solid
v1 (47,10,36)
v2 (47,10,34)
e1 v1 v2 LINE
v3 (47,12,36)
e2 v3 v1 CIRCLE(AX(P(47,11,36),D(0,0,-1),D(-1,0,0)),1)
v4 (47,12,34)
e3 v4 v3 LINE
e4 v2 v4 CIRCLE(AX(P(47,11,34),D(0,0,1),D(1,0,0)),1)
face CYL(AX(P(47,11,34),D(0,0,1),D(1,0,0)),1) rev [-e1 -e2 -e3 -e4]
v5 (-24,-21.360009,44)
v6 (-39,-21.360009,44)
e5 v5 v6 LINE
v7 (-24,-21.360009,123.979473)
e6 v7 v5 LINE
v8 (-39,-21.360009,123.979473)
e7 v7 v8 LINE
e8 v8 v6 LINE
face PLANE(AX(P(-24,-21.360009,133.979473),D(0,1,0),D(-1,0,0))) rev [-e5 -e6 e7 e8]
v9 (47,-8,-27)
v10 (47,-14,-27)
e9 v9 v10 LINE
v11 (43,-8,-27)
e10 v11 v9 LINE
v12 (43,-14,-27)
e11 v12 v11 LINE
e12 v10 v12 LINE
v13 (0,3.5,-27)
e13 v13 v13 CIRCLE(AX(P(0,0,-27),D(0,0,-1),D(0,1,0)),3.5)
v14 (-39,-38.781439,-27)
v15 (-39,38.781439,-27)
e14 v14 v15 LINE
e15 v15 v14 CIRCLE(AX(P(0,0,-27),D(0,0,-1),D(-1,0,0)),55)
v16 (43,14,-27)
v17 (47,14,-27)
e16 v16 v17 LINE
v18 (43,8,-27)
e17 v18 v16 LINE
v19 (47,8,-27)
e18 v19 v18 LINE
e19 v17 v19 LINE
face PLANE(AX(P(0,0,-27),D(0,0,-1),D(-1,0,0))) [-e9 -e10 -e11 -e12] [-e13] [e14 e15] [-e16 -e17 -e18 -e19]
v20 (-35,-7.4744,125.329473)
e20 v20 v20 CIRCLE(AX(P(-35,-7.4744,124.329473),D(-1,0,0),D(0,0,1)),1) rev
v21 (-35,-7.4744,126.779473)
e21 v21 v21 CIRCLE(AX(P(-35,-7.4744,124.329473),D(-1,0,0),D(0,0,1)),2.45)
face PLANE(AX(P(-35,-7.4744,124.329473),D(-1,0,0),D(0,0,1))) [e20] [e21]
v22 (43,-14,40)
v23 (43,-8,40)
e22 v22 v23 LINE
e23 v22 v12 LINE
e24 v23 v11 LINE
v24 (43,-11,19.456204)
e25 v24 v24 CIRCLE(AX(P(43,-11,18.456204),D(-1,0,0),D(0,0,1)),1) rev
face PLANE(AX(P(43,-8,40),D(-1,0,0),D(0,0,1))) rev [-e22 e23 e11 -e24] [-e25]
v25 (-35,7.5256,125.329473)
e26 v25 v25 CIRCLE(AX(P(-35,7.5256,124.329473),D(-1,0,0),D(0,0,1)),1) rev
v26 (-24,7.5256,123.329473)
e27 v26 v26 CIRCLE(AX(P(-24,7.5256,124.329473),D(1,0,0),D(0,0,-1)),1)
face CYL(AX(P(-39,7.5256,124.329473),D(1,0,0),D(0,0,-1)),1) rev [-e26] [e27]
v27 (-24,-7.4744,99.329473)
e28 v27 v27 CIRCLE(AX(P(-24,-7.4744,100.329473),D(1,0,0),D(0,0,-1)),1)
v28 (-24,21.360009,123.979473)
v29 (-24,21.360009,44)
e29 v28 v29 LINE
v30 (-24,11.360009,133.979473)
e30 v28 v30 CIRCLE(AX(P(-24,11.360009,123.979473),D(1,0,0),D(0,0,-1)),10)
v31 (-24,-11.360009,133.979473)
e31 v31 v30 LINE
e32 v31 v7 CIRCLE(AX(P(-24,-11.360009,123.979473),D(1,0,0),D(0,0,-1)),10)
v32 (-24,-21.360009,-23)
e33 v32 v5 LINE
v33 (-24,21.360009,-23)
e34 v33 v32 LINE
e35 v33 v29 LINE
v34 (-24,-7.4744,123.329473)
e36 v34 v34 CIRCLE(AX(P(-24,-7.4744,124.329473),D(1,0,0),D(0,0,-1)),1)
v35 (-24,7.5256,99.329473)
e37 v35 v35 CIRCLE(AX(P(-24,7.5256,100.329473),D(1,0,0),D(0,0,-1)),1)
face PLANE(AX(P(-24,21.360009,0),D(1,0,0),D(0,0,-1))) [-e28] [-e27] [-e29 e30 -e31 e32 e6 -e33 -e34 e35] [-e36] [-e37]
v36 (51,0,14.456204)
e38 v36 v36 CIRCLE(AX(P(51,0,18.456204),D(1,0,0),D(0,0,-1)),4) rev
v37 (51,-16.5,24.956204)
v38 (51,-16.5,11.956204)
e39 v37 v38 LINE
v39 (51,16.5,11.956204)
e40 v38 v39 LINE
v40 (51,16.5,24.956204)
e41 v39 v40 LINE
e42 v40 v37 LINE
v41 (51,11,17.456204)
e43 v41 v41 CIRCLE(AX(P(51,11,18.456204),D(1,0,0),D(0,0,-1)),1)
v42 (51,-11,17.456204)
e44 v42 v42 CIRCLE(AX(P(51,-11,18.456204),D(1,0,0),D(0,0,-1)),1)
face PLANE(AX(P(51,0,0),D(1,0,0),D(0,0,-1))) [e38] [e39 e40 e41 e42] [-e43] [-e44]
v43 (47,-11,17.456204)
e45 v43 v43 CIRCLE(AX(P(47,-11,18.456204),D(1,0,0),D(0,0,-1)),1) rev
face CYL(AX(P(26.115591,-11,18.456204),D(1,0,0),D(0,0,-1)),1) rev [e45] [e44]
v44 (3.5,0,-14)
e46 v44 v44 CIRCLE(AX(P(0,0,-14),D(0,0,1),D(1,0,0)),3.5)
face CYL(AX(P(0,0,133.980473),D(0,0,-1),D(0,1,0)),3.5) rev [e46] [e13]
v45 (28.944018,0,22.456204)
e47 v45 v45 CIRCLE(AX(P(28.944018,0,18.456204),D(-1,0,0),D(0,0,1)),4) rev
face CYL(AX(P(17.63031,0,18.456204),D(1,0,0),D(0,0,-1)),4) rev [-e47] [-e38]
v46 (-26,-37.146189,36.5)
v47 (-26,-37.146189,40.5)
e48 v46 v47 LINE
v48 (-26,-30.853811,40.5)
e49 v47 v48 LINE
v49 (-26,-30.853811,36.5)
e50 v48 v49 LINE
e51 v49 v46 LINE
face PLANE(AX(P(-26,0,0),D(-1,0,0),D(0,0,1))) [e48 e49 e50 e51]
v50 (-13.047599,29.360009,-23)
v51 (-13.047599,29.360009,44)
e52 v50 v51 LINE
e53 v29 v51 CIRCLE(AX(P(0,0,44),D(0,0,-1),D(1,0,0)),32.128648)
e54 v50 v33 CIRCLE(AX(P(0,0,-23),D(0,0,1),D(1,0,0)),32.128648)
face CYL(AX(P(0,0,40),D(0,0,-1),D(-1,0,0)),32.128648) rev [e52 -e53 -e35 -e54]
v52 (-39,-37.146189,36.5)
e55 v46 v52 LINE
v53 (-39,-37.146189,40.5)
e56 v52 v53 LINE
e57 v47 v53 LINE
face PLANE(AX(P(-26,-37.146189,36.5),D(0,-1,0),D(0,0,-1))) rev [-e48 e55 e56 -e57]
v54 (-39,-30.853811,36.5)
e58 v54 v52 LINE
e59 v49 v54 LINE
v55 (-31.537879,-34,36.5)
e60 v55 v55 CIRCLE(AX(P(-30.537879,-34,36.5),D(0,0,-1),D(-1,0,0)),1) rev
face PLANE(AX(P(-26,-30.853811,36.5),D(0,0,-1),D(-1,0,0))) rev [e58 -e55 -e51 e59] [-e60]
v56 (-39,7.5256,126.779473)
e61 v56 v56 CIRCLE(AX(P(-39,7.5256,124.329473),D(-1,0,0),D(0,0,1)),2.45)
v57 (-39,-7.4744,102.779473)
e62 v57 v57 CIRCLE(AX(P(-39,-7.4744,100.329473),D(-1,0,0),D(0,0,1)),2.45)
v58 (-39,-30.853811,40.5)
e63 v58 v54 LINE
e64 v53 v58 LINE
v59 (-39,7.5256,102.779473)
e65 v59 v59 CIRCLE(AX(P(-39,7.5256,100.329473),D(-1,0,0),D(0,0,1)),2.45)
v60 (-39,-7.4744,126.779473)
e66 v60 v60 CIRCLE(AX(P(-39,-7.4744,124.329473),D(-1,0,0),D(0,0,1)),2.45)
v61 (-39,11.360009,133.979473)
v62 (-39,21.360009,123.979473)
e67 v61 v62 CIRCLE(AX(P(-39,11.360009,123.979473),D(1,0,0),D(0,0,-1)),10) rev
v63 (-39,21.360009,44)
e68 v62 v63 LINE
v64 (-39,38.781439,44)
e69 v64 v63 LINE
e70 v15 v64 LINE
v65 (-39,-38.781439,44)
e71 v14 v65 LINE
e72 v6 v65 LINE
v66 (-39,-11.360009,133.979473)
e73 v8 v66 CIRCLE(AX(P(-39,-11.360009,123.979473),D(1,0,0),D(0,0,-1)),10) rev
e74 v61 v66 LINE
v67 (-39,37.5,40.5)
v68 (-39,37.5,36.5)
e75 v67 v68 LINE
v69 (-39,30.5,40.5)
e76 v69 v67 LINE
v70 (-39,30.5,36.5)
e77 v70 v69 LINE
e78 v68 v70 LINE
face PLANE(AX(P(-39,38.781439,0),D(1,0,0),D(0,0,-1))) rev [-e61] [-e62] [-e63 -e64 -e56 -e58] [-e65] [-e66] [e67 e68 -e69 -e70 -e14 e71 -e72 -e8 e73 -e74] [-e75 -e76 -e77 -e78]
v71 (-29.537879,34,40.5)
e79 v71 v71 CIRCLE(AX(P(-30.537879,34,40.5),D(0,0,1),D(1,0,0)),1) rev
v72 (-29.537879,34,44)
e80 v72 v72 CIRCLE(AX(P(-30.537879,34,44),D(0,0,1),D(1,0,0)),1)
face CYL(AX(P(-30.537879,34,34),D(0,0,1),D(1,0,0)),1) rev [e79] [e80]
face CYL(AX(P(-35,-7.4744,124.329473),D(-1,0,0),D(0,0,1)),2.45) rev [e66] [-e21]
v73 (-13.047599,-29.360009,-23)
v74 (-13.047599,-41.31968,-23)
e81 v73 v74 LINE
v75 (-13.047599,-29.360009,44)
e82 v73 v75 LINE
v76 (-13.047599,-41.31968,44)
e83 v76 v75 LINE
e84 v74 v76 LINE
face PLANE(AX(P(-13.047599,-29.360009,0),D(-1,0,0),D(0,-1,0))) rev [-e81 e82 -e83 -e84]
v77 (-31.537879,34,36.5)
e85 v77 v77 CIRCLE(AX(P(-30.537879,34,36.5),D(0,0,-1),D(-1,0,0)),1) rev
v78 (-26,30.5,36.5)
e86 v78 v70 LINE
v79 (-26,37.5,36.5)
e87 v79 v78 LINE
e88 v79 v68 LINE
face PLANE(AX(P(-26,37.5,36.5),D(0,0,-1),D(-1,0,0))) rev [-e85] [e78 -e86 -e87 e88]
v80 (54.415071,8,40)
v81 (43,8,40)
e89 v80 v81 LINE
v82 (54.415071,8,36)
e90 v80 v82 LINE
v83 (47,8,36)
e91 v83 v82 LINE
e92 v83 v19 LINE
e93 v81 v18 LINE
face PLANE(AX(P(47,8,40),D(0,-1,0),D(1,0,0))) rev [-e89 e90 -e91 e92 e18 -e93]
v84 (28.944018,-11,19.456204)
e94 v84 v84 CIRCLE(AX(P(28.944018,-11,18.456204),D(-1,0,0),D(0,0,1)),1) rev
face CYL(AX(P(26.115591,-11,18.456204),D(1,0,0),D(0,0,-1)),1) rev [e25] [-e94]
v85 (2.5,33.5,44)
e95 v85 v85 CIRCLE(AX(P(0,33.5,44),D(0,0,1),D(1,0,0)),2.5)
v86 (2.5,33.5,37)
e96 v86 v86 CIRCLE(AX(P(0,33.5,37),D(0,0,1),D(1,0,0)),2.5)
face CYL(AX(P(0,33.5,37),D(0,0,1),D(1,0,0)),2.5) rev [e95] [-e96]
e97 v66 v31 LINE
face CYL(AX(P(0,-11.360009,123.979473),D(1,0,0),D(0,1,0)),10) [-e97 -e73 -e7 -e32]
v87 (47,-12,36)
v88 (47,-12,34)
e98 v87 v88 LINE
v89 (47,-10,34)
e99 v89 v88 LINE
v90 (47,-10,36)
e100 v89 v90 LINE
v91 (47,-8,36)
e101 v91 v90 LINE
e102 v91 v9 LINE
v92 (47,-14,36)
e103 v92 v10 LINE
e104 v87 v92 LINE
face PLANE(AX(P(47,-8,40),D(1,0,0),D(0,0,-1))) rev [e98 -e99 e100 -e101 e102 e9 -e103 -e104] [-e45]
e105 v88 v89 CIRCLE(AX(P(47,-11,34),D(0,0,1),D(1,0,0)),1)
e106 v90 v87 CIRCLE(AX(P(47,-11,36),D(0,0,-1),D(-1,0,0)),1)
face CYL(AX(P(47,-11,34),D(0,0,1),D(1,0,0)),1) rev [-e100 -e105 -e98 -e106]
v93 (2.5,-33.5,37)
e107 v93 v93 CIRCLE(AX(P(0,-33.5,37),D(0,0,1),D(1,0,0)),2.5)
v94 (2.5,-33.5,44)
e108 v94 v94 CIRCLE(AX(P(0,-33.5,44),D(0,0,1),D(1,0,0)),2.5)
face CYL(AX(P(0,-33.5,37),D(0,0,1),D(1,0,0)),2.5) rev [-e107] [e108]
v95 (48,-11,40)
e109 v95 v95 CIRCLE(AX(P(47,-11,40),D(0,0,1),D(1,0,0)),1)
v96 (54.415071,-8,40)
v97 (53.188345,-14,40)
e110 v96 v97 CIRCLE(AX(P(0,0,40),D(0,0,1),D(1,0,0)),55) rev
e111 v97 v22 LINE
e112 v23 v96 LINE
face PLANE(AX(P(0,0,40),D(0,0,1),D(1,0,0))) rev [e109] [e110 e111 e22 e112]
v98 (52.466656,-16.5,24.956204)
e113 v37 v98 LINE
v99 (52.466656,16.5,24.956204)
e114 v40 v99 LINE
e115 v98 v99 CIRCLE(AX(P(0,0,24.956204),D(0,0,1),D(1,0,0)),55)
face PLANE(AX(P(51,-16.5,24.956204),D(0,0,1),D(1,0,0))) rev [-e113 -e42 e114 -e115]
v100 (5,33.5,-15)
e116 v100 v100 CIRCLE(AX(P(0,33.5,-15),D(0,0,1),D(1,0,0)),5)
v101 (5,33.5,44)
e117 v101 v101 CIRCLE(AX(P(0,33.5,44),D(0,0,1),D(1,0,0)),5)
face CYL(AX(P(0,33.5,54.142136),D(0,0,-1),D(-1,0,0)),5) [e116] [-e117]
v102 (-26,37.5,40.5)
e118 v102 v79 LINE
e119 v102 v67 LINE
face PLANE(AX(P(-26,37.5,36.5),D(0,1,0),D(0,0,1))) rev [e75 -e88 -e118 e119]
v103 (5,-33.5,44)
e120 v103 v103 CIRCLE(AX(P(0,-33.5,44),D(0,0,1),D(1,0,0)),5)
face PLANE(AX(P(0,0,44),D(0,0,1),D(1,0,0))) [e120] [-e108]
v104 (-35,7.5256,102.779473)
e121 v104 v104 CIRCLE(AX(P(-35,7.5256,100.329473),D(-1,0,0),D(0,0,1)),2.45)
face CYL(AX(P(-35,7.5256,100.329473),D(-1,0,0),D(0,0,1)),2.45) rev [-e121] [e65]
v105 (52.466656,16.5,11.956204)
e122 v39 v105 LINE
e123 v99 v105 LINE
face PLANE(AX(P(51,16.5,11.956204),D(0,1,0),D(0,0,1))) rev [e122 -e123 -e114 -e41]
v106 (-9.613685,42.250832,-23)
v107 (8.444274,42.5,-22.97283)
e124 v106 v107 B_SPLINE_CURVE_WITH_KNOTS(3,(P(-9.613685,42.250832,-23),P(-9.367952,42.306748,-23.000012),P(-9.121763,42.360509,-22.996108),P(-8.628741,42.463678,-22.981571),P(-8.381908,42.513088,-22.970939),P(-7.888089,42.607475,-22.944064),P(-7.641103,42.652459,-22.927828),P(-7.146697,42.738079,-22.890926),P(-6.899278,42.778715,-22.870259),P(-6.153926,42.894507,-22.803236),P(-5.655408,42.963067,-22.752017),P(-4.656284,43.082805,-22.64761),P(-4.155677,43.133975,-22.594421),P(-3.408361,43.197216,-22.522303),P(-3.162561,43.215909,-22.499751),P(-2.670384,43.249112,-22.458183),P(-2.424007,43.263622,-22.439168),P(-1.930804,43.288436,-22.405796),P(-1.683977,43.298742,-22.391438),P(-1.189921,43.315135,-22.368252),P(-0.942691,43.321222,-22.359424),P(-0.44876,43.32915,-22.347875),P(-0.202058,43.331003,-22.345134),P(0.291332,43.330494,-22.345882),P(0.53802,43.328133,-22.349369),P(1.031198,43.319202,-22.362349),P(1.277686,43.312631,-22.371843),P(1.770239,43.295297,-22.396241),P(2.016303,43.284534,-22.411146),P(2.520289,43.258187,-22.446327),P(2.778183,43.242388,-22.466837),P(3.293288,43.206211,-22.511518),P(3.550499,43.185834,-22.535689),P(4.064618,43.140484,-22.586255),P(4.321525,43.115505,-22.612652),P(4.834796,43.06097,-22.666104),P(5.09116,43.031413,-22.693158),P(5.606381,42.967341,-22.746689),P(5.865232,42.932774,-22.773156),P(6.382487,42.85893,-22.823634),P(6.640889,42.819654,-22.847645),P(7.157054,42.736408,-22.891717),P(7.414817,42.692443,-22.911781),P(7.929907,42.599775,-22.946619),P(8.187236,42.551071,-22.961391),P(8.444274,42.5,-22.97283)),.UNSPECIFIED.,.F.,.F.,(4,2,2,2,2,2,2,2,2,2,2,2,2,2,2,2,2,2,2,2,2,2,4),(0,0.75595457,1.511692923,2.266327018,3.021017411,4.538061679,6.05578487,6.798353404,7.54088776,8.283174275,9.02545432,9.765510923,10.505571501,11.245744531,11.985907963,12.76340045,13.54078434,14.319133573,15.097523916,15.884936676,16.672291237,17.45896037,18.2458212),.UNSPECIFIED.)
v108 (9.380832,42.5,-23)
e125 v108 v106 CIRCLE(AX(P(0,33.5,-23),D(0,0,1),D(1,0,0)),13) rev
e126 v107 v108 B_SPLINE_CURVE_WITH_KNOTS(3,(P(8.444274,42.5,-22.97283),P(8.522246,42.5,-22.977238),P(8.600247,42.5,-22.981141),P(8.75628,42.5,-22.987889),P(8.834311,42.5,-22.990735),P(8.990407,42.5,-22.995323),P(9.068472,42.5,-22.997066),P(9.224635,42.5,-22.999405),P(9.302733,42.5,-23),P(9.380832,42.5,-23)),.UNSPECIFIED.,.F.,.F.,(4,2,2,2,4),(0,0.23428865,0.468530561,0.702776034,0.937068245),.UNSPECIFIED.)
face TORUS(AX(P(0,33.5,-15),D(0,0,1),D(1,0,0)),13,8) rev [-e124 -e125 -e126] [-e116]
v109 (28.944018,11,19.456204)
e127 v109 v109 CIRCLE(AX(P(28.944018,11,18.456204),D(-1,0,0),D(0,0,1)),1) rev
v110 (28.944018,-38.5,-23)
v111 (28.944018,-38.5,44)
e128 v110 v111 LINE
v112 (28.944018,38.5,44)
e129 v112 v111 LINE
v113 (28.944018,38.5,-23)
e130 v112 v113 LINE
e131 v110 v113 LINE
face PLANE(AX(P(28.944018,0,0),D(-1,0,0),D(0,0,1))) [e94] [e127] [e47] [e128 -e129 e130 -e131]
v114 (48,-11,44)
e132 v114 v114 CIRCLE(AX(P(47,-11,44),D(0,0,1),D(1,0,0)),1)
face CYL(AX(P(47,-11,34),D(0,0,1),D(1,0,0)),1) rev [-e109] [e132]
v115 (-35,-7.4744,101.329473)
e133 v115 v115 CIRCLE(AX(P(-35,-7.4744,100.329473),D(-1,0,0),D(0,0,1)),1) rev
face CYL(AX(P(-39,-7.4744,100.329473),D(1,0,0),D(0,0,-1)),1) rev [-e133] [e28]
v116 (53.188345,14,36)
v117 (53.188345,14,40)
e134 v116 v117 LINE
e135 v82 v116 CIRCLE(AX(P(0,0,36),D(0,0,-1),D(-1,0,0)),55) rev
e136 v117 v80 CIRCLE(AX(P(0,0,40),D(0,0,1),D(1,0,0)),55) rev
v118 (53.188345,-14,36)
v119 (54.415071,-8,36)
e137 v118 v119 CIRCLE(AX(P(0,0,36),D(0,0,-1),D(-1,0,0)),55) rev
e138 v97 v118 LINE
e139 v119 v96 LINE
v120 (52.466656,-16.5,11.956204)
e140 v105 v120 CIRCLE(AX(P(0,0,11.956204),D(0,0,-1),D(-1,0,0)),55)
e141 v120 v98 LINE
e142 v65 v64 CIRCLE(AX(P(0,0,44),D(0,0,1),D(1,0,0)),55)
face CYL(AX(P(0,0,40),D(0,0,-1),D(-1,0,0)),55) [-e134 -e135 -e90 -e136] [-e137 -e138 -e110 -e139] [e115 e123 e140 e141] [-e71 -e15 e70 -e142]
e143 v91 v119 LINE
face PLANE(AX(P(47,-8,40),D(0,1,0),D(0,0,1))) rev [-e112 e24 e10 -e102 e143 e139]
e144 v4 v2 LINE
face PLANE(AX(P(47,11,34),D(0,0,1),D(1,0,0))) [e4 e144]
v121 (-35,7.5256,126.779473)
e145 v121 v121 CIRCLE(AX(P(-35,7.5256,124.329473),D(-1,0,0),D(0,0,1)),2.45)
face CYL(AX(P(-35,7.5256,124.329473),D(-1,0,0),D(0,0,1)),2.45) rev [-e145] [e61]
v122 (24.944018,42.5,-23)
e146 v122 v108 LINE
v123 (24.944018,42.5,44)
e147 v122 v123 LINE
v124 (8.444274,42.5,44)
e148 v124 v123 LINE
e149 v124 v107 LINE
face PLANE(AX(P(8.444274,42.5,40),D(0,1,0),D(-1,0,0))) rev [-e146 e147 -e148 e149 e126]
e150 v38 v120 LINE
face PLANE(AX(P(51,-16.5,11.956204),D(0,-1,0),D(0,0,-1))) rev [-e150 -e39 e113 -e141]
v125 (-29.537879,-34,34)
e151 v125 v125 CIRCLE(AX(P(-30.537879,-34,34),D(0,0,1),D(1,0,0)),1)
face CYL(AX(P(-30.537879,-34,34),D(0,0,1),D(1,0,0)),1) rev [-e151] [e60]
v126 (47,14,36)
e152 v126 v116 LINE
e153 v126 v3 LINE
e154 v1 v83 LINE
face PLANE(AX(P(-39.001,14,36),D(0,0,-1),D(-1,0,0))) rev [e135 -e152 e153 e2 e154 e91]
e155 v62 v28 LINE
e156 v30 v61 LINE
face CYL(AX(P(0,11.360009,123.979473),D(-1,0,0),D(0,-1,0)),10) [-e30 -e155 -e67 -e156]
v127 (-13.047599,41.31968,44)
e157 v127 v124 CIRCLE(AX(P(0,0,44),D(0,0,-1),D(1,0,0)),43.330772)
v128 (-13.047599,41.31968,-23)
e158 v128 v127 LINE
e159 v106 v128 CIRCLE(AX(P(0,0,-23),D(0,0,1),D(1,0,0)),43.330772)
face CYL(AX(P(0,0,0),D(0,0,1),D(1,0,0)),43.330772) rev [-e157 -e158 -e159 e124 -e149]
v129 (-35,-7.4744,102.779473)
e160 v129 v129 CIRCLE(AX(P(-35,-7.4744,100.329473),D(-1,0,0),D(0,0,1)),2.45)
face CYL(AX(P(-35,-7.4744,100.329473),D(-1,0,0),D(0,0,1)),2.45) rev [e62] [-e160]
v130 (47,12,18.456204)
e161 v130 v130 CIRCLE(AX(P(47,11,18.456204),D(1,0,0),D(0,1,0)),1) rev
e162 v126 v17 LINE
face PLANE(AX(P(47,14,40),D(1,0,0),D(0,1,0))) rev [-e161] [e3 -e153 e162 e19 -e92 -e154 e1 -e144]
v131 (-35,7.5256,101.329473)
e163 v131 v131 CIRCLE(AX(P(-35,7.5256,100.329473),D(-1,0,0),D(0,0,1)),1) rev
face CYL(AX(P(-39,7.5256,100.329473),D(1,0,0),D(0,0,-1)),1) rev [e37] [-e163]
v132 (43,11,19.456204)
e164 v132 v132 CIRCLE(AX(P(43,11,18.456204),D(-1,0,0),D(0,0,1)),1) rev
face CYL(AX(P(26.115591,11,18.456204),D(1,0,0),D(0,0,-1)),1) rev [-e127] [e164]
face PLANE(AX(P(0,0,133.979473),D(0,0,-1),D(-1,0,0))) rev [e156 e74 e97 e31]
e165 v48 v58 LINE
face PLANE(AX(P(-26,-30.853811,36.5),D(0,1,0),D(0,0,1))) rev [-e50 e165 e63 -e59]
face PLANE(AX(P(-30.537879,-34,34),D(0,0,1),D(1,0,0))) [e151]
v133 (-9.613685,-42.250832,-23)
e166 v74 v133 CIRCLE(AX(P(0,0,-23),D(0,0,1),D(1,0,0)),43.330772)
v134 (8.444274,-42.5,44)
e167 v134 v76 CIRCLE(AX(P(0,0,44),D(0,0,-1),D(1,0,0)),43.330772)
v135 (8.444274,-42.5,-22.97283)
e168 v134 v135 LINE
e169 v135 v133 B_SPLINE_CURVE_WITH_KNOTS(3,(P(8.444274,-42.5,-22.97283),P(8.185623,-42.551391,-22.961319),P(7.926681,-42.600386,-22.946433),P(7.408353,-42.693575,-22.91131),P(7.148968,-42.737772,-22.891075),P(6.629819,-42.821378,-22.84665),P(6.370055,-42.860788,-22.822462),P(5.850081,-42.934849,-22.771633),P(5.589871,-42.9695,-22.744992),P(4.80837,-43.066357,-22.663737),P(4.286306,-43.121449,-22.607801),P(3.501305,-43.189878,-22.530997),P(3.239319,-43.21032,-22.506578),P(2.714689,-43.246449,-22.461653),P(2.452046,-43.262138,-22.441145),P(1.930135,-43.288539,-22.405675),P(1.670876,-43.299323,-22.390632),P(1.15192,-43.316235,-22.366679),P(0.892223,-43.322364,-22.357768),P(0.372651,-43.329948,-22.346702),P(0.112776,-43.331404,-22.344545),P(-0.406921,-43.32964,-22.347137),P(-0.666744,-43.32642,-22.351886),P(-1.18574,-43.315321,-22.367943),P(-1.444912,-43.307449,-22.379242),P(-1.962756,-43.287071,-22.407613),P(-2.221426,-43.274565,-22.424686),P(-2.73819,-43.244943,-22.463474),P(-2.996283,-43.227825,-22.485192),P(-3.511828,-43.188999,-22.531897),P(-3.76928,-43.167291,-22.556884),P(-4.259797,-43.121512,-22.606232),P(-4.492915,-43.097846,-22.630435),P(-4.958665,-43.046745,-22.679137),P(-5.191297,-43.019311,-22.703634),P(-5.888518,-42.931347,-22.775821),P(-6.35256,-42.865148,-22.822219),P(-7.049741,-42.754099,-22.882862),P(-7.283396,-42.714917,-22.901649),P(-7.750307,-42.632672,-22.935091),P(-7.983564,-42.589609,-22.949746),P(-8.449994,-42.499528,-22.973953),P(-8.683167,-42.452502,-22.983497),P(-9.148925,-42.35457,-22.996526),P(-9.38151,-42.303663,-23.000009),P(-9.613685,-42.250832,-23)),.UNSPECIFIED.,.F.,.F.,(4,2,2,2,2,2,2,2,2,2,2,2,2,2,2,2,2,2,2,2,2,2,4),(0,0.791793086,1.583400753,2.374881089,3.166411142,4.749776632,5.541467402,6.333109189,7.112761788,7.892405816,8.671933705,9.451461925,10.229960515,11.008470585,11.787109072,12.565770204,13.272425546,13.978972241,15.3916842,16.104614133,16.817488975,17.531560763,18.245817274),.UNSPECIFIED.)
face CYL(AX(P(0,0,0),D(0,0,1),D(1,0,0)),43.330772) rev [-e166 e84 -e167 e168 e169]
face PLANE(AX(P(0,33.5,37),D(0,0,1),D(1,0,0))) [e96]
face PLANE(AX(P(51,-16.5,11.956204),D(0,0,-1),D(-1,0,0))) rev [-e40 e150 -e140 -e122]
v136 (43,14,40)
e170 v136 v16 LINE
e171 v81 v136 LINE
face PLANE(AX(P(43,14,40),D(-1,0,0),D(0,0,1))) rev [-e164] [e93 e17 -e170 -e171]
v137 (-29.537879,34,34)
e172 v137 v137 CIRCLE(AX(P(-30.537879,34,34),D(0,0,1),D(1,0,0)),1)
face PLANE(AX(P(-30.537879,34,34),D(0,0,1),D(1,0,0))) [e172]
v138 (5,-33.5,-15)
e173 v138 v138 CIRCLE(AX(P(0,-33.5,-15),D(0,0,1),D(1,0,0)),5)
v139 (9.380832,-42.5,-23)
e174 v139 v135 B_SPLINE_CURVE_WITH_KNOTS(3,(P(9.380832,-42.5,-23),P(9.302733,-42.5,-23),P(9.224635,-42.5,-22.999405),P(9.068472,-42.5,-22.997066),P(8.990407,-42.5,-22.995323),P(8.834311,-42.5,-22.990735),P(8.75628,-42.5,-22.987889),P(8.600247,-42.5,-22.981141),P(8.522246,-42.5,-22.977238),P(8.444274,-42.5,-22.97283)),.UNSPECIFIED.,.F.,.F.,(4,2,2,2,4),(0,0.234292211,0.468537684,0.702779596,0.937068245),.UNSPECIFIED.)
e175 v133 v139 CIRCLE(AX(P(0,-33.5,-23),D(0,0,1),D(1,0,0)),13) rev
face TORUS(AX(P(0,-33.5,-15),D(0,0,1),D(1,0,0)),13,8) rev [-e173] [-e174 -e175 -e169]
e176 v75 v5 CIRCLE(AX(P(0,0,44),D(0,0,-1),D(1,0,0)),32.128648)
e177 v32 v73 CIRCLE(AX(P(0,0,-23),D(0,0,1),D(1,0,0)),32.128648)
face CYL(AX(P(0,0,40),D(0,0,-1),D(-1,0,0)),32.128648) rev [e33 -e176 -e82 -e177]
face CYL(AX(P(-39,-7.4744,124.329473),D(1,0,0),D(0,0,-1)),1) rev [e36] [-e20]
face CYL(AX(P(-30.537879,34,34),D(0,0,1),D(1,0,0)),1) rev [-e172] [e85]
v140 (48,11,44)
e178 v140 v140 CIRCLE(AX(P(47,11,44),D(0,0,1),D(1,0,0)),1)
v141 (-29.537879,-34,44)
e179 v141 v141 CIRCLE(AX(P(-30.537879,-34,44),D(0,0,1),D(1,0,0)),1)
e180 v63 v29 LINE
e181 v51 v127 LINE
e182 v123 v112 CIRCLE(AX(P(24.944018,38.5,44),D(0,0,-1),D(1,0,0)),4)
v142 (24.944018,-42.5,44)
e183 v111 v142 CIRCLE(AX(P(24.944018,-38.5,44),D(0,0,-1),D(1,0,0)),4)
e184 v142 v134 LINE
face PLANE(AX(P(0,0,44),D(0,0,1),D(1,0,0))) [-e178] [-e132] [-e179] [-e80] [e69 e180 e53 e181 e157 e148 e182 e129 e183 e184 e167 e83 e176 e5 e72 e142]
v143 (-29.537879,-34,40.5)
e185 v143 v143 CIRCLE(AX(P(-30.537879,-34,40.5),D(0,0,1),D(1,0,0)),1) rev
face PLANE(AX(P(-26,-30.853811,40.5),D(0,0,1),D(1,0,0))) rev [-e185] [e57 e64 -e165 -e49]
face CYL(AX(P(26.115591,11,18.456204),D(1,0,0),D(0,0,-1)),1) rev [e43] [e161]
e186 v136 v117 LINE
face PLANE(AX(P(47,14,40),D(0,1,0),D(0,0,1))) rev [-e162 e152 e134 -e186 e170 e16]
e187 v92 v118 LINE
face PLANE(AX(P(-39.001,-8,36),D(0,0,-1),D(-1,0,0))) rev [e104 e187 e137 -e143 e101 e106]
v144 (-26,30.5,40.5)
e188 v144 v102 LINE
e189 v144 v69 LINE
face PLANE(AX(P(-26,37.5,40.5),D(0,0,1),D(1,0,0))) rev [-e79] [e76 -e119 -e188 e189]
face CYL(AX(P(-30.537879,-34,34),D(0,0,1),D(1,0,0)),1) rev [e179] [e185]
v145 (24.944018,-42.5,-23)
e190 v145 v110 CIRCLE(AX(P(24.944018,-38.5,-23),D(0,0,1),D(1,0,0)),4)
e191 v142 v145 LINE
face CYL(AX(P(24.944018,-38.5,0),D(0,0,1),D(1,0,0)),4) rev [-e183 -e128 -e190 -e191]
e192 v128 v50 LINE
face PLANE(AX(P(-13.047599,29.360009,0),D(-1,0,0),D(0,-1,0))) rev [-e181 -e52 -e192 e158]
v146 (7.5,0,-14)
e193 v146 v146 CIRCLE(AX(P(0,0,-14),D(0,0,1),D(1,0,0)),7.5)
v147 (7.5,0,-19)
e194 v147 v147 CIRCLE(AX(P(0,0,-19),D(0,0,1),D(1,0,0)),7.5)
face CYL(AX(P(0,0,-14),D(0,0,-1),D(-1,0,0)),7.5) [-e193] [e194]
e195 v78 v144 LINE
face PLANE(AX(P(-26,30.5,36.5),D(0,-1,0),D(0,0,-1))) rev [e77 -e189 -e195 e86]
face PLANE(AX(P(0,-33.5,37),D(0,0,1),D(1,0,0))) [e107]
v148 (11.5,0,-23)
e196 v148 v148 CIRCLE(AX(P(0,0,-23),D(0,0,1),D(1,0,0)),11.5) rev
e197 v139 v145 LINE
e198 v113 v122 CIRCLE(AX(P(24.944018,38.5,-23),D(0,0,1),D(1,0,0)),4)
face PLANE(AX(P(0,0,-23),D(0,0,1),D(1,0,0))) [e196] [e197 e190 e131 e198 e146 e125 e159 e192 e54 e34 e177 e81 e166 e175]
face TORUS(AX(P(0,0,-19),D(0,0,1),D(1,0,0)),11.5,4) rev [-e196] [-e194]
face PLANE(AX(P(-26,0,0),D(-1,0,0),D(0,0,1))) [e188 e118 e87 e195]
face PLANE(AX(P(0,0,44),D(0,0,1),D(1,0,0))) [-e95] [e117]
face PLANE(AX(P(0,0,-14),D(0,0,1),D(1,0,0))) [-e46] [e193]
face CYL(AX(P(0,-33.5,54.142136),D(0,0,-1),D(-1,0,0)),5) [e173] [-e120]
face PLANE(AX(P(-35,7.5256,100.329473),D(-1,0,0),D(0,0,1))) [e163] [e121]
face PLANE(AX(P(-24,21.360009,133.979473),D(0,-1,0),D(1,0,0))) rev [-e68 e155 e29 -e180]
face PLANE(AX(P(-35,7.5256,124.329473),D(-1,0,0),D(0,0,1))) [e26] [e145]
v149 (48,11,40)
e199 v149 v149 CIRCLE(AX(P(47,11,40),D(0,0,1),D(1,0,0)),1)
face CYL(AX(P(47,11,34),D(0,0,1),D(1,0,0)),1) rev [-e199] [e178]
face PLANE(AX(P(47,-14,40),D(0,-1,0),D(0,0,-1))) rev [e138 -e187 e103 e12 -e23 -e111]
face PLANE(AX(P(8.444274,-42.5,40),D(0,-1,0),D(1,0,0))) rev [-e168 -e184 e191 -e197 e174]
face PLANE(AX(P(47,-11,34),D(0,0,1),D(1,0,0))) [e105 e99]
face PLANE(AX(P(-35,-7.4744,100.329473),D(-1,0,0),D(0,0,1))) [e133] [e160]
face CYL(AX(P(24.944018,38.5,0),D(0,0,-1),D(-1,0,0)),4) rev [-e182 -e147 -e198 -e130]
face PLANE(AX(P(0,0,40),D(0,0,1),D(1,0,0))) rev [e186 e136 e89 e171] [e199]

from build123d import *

# Parameters (mm, degrees)
SKETCH1_R            = 55
BOSS_EXTRUDE1_DEPTH  = 40
SKETCH2_W            = 20.494473429
SKETCH2_H            = 85
CUT_EXTRUDE1_DEPTH   = 88.464278423
BOSS_EXTRUDE2_DEPTH  = 40
SKETCH4_W            = 40
SKETCH4_H            = 85
CUT_EXTRUDE2_DEPTH   = 0.00527065
FILLET1_R            = 4
SKETCH5_R            = 4
CUT_EXTRUDE3_DEPTH   = 26.05598176
SKETCH6_W            = 13
SKETCH6_H            = 33
CUT_EXTRUDE4_DEPTH   = 4
SKETCH7_R            = 1
CUT_EXTRUDE5_DEPTH   = 22.05598176
SKETCH8_W            = 4
SKETCH8_H            = 6
CUT_EXTRUDE6_DEPTH   = 88.464278423
BOSS_EXTRUDE3_DEPTH  = 40
CUT_EXTRUDE7_DEPTH   = 88.464278423
SKETCH11_W           = 15
SKETCH11_H           = 42.720018726
BOSS_EXTRUDE4_DEPTH  = 93.97947282
SKETCH12_R           = 1
CUT_EXTRUDE8_DEPTH   = 165.974237798
SKETCH13_R           = 2.45
CUT_EXTRUDE9_DEPTH   = 4
CUT_EXTRUDE10_DEPTH  = 122.992382186
BOSS_EXTRUDE5_START  = 22
SKETCH15_W           = 4
SKETCH15_H           = 6
BOSS_EXTRUDE5_DEPTH  = 22
BOSS_EXTRUDE6_START  = 5
SKETCH16_W           = 4
SKETCH16_H           = 6
BOSS_EXTRUDE6_DEPTH  = 5
SKETCH17_R           = 5
BOSS_EXTRUDE7_DEPTH  = 62
BOSS_EXTRUDE8_DEPTH  = 4
SKETCH19_R           = 5
BOSS_EXTRUDE9_DEPTH  = 4
SKETCH20_R           = 2.5
CUT_EXTRUDE11_DEPTH  = 7
CUT_EXTRUDE12_START  = -1
SKETCH21_R           = 5
CUT_EXTRUDE12_DEPTH  = 1
SKETCH22_R           = 1
CUT_EXTRUDE13_DEPTH  = 10
CUT_EXTRUDE14_REACH  = 174.66
SKETCH23_W           = 4
SKETCH23_H           = 6
SKETCH24_W           = 4
SKETCH24_H           = 7
SKETCH24_H_2         = 6.292378966
CUT_EXTRUDE15_DEPTH  = 13
CUT_EXTRUDE16_REACH  = 180.786
SKETCH25_R           = 3.5
SKETCH27_R           = 7.5
SKETCH27_R_2         = 3.5
BOSS_EXTRUDE11_DEPTH = 9
FILLET3_R            = 10
FILLET4_R            = 8
FILLET5_R            = 4


with BuildPart() as part:
    # Sketch1 → Boss-Extrude1 (new body)
    with BuildSketch(Plane.XY):
        Circle(SKETCH1_R)
        with BuildLine():
            Line((1.5, -40), (-1.5, -40))
            ThreePointArc((-1.5, -40), (-8.571067812, -37.071067812), (-11.5, -30))
            ThreePointArc((-11.5, -30), (-32.128647653, 0), (-11.5, 30))
            ThreePointArc((-11.5, 30), (-8.571067812, 37.071067812), (-1.5, 40))
            Line((-1.5, 40), (1.5, 40))
            ThreePointArc((1.5, 40), (8.571067812, 37.071067812), (11.5, 30))
            ThreePointArc((11.5, 30), (32.128647653, 0), (11.5, -30))
            ThreePointArc((11.5, -30), (8.571067812, -37.071067812), (1.5, -40))
        make_face(mode=Mode.SUBTRACT)
    extrude(amount=BOSS_EXTRUDE1_DEPTH)

    # Sketch2 → Cut-Extrude1 (cut, through all)
    with BuildSketch(Plane(origin=(0, 0, 0), x_dir=(-1, 0, 0), z_dir=(0, 0, -1))):
        with Locations((-18.691510876, 0)):
            Rectangle(SKETCH2_W, SKETCH2_H)
    extrude(amount=-CUT_EXTRUDE1_DEPTH, mode=Mode.SUBTRACT)

    # Sketch3 → Boss-Extrude2 (add, through all)
    with BuildSketch(Plane(origin=(0, 0, 0), x_dir=(-1, 0, 0), z_dir=(0, 0, -1))):
        with BuildLine():
            Line((-28.93874759, 13.957037218), (-28.93874759, -13.957037218))
            ThreePointArc((-28.93874759, -13.957037218), (-32.128647653, 0), (-28.93874759, 13.957037218))
        make_face()
    extrude(amount=-BOSS_EXTRUDE2_DEPTH)

    # Sketch4 → Cut-Extrude2 (cut)
    with BuildSketch(Plane.ZY.offset(-28.93874759)):
        with Locations((20, 0)):
            Rectangle(SKETCH4_W, SKETCH4_H)
    extrude(amount=-CUT_EXTRUDE2_DEPTH, mode=Mode.SUBTRACT)

    # Fillet1
    fillet1_edges = [part.edges().sort_by_distance(p)[0] for p in [
        (28.94401824, 42.5, 20),
        (28.94401824, -42.5, 20),
    ]]
    fillet(fillet1_edges, radius=FILLET1_R)

    # Sketch5 → Cut-Extrude3 (cut)
    with BuildSketch(Plane(origin=(55, 0, 0), x_dir=(0, 0, -1), z_dir=(1, 0, 0))):
        with Locations(Location((-18.45620411, 0, 0), (0, 0, 180))):
            Circle(SKETCH5_R)
    extrude(amount=-CUT_EXTRUDE3_DEPTH, mode=Mode.SUBTRACT)

    # Sketch6 → Cut-Extrude4 (cut)
    with BuildSketch(Plane(origin=(55, 0, 0), x_dir=(0, 0, -1), z_dir=(1, 0, 0))):
        with Locations((-18.45620411, 0)):
            Rectangle(SKETCH6_W, SKETCH6_H)
    extrude(amount=-CUT_EXTRUDE4_DEPTH, mode=Mode.SUBTRACT)

    # Sketch7 → Cut-Extrude5 (cut)
    with BuildSketch(Plane(origin=(51, 0, 0), x_dir=(0, 0, -1), z_dir=(1, 0, 0))):
        with Locations((-18.45620411, 11)):
            Circle(SKETCH7_R)
        with Locations((-18.45620411, -11)):
            Circle(SKETCH7_R)
    extrude(amount=-CUT_EXTRUDE5_DEPTH, mode=Mode.SUBTRACT)

    # Sketch8 → Cut-Extrude6 (cut, through all)
    with BuildSketch(Plane(origin=(0, 0, 0), x_dir=(-1, 0, 0), z_dir=(0, 0, -1))):
        with Locations((-45, 11)):
            Rectangle(SKETCH8_W, SKETCH8_H)
        with Locations((-45, -11)):
            Rectangle(SKETCH8_W, SKETCH8_H)
    extrude(amount=-CUT_EXTRUDE6_DEPTH, mode=Mode.SUBTRACT)

    # Sketch9 → Boss-Extrude3 (add, through all)
    with BuildSketch(Plane.XY.offset(40)):
        with BuildLine():
            Line((-24, 21.360009363), (-24, -21.360009363))
            ThreePointArc((-24, -21.360009363), (-32.128647653, 0), (-24, 21.360009363))
        make_face()
    extrude(amount=-BOSS_EXTRUDE3_DEPTH)

    # Sketch10 → Cut-Extrude7 (cut, through all)
    with BuildSketch(Plane.XY.offset(40)):
        with BuildLine():
            Line((-39, 38.781438859), (-39, -38.781438859))
            ThreePointArc((-39, -38.781438859), (-55, 0), (-39, 38.781438859))
        make_face()
    extrude(amount=-CUT_EXTRUDE7_DEPTH, mode=Mode.SUBTRACT)

    # Sketch11 → Boss-Extrude4 (add)
    with BuildSketch(Plane.XY.offset(40)):
        with Locations((-31.5, 0)):
            Rectangle(SKETCH11_W, SKETCH11_H)
    extrude(amount=BOSS_EXTRUDE4_DEPTH)

    # Sketch12 → Cut-Extrude8 (cut, through all)
    with BuildSketch(Plane(origin=(-24, 0, 0), x_dir=(0, 0, -1), z_dir=(1, 0, 0))):
        with Locations((-124.32947282, -7.474399757)):
            Circle(SKETCH12_R)
        with Locations((-124.32947282, 7.525600243)):
            Circle(SKETCH12_R)
        with Locations((-100.32947282, -7.474399757)):
            Circle(SKETCH12_R)
        with Locations((-100.32947282, 7.525600243)):
            Circle(SKETCH12_R)
    extrude(amount=-CUT_EXTRUDE8_DEPTH, mode=Mode.SUBTRACT)

    # Sketch13 → Cut-Extrude9 (cut)
    with BuildSketch(Plane.ZY.offset(39)):
        with Locations((100.32947282, 7.525600243)):
            Circle(SKETCH13_R)
        with Locations((124.32947282, 7.525600243)):
            Circle(SKETCH13_R)
        with Locations((124.32947282, -7.474399757)):
            Circle(SKETCH13_R)
        with Locations((100.32947282, -7.474399757)):
            Circle(SKETCH13_R)
    extrude(amount=-CUT_EXTRUDE9_DEPTH, mode=Mode.SUBTRACT)

    # Sketch14 → Cut-Extrude10 (cut, through all)
    with BuildSketch(Plane.XY.offset(40)):
        with BuildLine():
            Line((-24, -21.360009363), (-24, 21.360009363))
            ThreePointArc((-24, 21.360009363), (-18.950756064, 25.944534003), (-13.047599403, 29.360009363))
            Line((-13.047599403, 29.360009363), (-13.047599403, 41.319679523))
            ThreePointArc((-13.047599403, 41.319679523), (9.151901203, 42.353258086), (28.94401824, 32.245923374))
            Line((28.94401824, 32.245923374), (28.94401824, -32.245923374))
            ThreePointArc((28.94401824, -32.245923374), (9.151901203, -42.353258086), (-13.047599403, -41.319679523))
            Line((-13.047599403, -41.319679523), (-13.047599403, -29.360009363))
            ThreePointArc((-13.047599403, -29.360009363), (-18.950756064, -25.944534003), (-24, -21.360009363))
        make_face()
    extrude(amount=-CUT_EXTRUDE10_DEPTH, mode=Mode.SUBTRACT)

    # Sketch15 → Boss-Extrude5 (add)
    with BuildSketch(Plane(origin=(0, 0, 0), x_dir=(-1, 0, 0), z_dir=(0, 0, -1)).offset(BOSS_EXTRUDE5_START)):
        with BuildLine():
            Line((39, 38.781438859), (39, -38.781438859))
            ThreePointArc((39, -38.781438859), (-55, 0), (39, 38.781438859))
        make_face()
        with BuildLine():
            Line((-24.94401824, -42.5), (-8.444274161, -42.5))
            ThreePointArc((-8.444274161, -42.5), (2.376118669, -43.265573221), (13.047599403, -41.319679523))
            Line((13.047599403, -41.319679523), (13.047599403, -29.360009363))
            ThreePointArc((13.047599403, -29.360009363), (18.950756064, -25.944534003), (24, -21.360009363))
            Line((24, -21.360009363), (24, 21.360009363))
            ThreePointArc((24, 21.360009363), (18.950756064, 25.944534003), (13.047599403, 29.360009363))
            Line((13.047599403, 29.360009363), (13.047599403, 41.319679523))
            ThreePointArc((13.047599403, 41.319679523), (2.376118669, 43.265573221), (-8.444274161, 42.5))
            Line((-8.444274161, 42.5), (-24.94401824, 42.5))
            ThreePointArc((-24.94401824, 42.5), (-27.772445365, 41.328427125), (-28.94401824, 38.5))
            Line((-28.94401824, 38.5), (-28.94401824, -38.5))
            ThreePointArc((-28.94401824, -38.5), (-27.772445365, -41.328427125), (-24.94401824, -42.5))
        make_face(mode=Mode.SUBTRACT)
        with Locations((-45, -11)):
            Rectangle(SKETCH15_W, SKETCH15_H, mode=Mode.SUBTRACT)
        with Locations((-45, 11)):
            Rectangle(SKETCH15_W, SKETCH15_H, mode=Mode.SUBTRACT)
    extrude(amount=-BOSS_EXTRUDE5_DEPTH)

    # Sketch16 → Boss-Extrude6 (add)
    with BuildSketch(Plane(origin=(0, 0, -22), x_dir=(-1, 0, 0), z_dir=(0, 0, -1)).offset(BOSS_EXTRUDE6_START)):
        with BuildLine():
            Line((39, -38.781438859), (39, 38.781438859))
            ThreePointArc((39, 38.781438859), (-55, 0), (39, -38.781438859))
        make_face()
        with Locations((-45, -11)):
            Rectangle(SKETCH16_W, SKETCH16_H, mode=Mode.SUBTRACT)
        with Locations((-45, 11)):
            Rectangle(SKETCH16_W, SKETCH16_H, mode=Mode.SUBTRACT)
    extrude(amount=-BOSS_EXTRUDE6_DEPTH)

    # Sketch17 → Boss-Extrude7 (add)
    with BuildSketch(Plane.XY.offset(-22)):
        with Locations(Location((0, 33.5, 0), (0, 0, 180))):
            Circle(SKETCH17_R)
        with Locations(Location((0, -33.5, 0), (0, 0, 180))):
            Circle(SKETCH17_R)
    extrude(amount=BOSS_EXTRUDE7_DEPTH)

    # Sketch18 → Boss-Extrude8 (add)
    with BuildSketch(Plane.XY.offset(40)):
        with BuildLine():
            Line((-24, -21.360009363), (-39, -21.360009363))
            Line((-39, -21.360009363), (-39, -38.781438859))
            ThreePointArc((-39, -38.781438859), (55, 0), (-39, 38.781438859))
            Line((-39, 38.781438859), (-39, 21.360009363))
            Line((-39, 21.360009363), (-24, 21.360009363))
            ThreePointArc((-24, 21.360009363), (-18.950756064, 25.944534003), (-13.047599403, 29.360009363))
            Line((-13.047599403, 29.360009363), (-13.047599403, 41.319679523))
            ThreePointArc((-13.047599403, 41.319679523), (-2.376118669, 43.265573221), (8.444274161, 42.5))
            Line((8.444274161, 42.5), (24.94401824, 42.5))
            ThreePointArc((24.94401824, 42.5), (27.772445365, 41.328427125), (28.94401824, 38.5))
            Line((28.94401824, 38.5), (28.94401824, -38.5))
            ThreePointArc((28.94401824, -38.5), (27.772445365, -41.328427125), (24.94401824, -42.5))
            Line((24.94401824, -42.5), (8.444274161, -42.5))
            ThreePointArc((8.444274161, -42.5), (-2.376118669, -43.265573221), (-13.047599403, -41.319679523))
            Line((-13.047599403, -41.319679523), (-13.047599403, -29.360009363))
            ThreePointArc((-13.047599403, -29.360009363), (-18.950756064, -25.944534003), (-24, -21.360009363))
        make_face()
    extrude(amount=BOSS_EXTRUDE8_DEPTH)

    # Sketch19 → Boss-Extrude9 (add)
    with BuildSketch(Plane.XY.offset(40)):
        with Locations(Location((0, 33.5, 0), (0, 0, 180))):
            Circle(SKETCH19_R)
        with Locations(Location((0, -33.5, 0), (0, 0, 180))):
            Circle(SKETCH19_R)
    extrude(amount=BOSS_EXTRUDE9_DEPTH)

    # Sketch20 → Cut-Extrude11 (cut)
    with BuildSketch(Plane.XY.offset(44)):
        with Locations((0, 33.5)):
            Circle(SKETCH20_R)
        with Locations((0, -33.5)):
            Circle(SKETCH20_R)
    extrude(amount=-CUT_EXTRUDE11_DEPTH, mode=Mode.SUBTRACT)

    # Sketch21 → Cut-Extrude12 (cut)
    with BuildSketch(Plane.XY.offset(-22).offset(CUT_EXTRUDE12_START)):
        with BuildLine():
            Line((8.444274161, -42.5), (24.94401824, -42.5))
            ThreePointArc((24.94401824, -42.5), (27.772445365, -41.328427125), (28.94401824, -38.5))
            Line((28.94401824, -38.5), (28.94401824, 38.5))
            ThreePointArc((28.94401824, 38.5), (27.772445365, 41.328427125), (24.94401824, 42.5))
            Line((24.94401824, 42.5), (8.444274161, 42.5))
            ThreePointArc((8.444274161, 42.5), (-2.376118669, 43.265573221), (-13.047599403, 41.319679523))
            Line((-13.047599403, 41.319679523), (-13.047599403, 29.360009363))
            ThreePointArc((-13.047599403, 29.360009363), (-18.950756064, 25.944534003), (-24, 21.360009363))
            Line((-24, 21.360009363), (-24, -21.360009363))
            ThreePointArc((-24, -21.360009363), (-18.950756064, -25.944534003), (-13.047599403, -29.360009363))
            Line((-13.047599403, -29.360009363), (-13.047599403, -41.319679523))
            ThreePointArc((-13.047599403, -41.319679523), (-2.376118669, -43.265573221), (8.444274161, -42.5))
        make_face()
        with Locations((0, 33.5)):
            Circle(SKETCH21_R, mode=Mode.SUBTRACT)
        with Locations((0, -33.5)):
            Circle(SKETCH21_R, mode=Mode.SUBTRACT)
    extrude(amount=CUT_EXTRUDE12_DEPTH, mode=Mode.SUBTRACT)

    # Sketch22 → Cut-Extrude13 (cut)
    with BuildSketch(Plane.XY.offset(44)):
        with Locations((-30.537878891, -34)):
            Circle(SKETCH22_R)
        with Locations((-30.537878891, 34)):
            Circle(SKETCH22_R)
        with Locations((47, 11)):
            Circle(SKETCH22_R)
        with Locations((47, -11)):
            Circle(SKETCH22_R)
    extrude(amount=-CUT_EXTRUDE13_DEPTH, mode=Mode.SUBTRACT)

    # Sketch23 → Cut-Extrude14 (cut, up to next)
    with BuildSketch(Plane(origin=(55, 0, 0), x_dir=(0, 0, -1), z_dir=(1, 0, 0)), mode=Mode.PRIVATE) as cut_extrude14_sk1:
        with Locations((-38, -11)):
            Rectangle(SKETCH23_W, SKETCH23_H)
    cut_extrude14_tool1 = extrude(cut_extrude14_sk1.sketch, amount=-CUT_EXTRUDE14_REACH, mode=Mode.PRIVATE) & part.part
    # Sketch23 → Cut-Extrude14 (cut, up to next)
    with BuildSketch(Plane(origin=(55, 0, 0), x_dir=(0, 0, -1), z_dir=(1, 0, 0)), mode=Mode.PRIVATE) as cut_extrude14_sk2:
        with Locations((-38, 11)):
            Rectangle(SKETCH23_W, SKETCH23_H)
    cut_extrude14_tool2 = extrude(cut_extrude14_sk2.sketch, amount=-CUT_EXTRUDE14_REACH, mode=Mode.PRIVATE) & part.part
    add(cut_extrude14_tool1.solids().sort_by_distance((55, -11, 38))[0], mode=Mode.SUBTRACT)
    add(cut_extrude14_tool2.solids().sort_by_distance((55, 11, 38))[0], mode=Mode.SUBTRACT)

    # Sketch24 → Cut-Extrude15 (cut)
    with BuildSketch(Plane.ZY.offset(39)):
        with Locations((38.5, 34)):
            Rectangle(SKETCH24_W, SKETCH24_H)
        with Locations((38.5, -34)):
            Rectangle(SKETCH24_W, SKETCH24_H_2)
    extrude(amount=-CUT_EXTRUDE15_DEPTH, mode=Mode.SUBTRACT)

    # Sketch25 → Cut-Extrude16 (cut, up to next)
    with BuildSketch(Plane(origin=(0, 0, -27), x_dir=(-1, 0, 0), z_dir=(0, 0, -1)), mode=Mode.PRIVATE) as cut_extrude16_sk1:
        with Locations(Location((0, 0, 0), (0, 0, 90))):
            Circle(SKETCH25_R)
    cut_extrude16_tool1 = extrude(cut_extrude16_sk1.sketch, amount=-CUT_EXTRUDE16_REACH, mode=Mode.PRIVATE) & part.part
    add(cut_extrude16_tool1.solids().sort_by_distance((0, 0, -27))[0], mode=Mode.SUBTRACT)

    # Sketch27 → Boss-Extrude11 (add)
    with BuildSketch(Plane.XY.offset(-23)):
        Circle(SKETCH27_R)
        with Locations(Location((0, 0, 0), (0, 0, 90))):
            Circle(SKETCH27_R_2, mode=Mode.SUBTRACT)
    extrude(amount=BOSS_EXTRUDE11_DEPTH)

    # Fillet3
    fillet3_edges = [part.edges().sort_by_distance(p)[0] for p in [
        (-31.5, -21.360009363, 133.97947282),
        (-31.5, 21.360009363, 133.97947282),
    ]]
    fillet(fillet3_edges, radius=FILLET3_R)

    # Fillet4
    # the kernel refuses this fillet: 8 mm, written as the material it adds along each edge
    with BuildSketch(Plane(origin=(0, -33.5, -23), x_dir=(1, 0, 0), z_dir=(0, -1, 0))) as fillet4_piece_1:
        with BuildLine():
            CenterArc((5 + FILLET4_R, FILLET4_R), FILLET4_R, 180, 90)
            Line((5, FILLET4_R), (5, 0))
            Line((5, 0), (5 + FILLET4_R, 0))
        make_face()
    revolve(axis=Axis((0, -33.5, -23), (0, 0, 1)))
    with BuildSketch(Plane(origin=(0, 33.5, -23), x_dir=(1, 0, 0), z_dir=(0, -1, 0))) as fillet4_piece_2:
        with BuildLine():
            CenterArc((5 + FILLET4_R, FILLET4_R), FILLET4_R, 180, 90)
            Line((5, FILLET4_R), (5, 0))
            Line((5, 0), (5 + FILLET4_R, 0))
        make_face()
    revolve(axis=Axis((0, 33.5, -23), (0, 0, 1)))

    # Fillet5
    fillet5_edges = [part.edges().sort_by_distance(p)[0] for p in [
        (-7.5, 0, -23),
    ]]
    fillet(fillet5_edges, radius=FILLET5_R)


solid = part.part
